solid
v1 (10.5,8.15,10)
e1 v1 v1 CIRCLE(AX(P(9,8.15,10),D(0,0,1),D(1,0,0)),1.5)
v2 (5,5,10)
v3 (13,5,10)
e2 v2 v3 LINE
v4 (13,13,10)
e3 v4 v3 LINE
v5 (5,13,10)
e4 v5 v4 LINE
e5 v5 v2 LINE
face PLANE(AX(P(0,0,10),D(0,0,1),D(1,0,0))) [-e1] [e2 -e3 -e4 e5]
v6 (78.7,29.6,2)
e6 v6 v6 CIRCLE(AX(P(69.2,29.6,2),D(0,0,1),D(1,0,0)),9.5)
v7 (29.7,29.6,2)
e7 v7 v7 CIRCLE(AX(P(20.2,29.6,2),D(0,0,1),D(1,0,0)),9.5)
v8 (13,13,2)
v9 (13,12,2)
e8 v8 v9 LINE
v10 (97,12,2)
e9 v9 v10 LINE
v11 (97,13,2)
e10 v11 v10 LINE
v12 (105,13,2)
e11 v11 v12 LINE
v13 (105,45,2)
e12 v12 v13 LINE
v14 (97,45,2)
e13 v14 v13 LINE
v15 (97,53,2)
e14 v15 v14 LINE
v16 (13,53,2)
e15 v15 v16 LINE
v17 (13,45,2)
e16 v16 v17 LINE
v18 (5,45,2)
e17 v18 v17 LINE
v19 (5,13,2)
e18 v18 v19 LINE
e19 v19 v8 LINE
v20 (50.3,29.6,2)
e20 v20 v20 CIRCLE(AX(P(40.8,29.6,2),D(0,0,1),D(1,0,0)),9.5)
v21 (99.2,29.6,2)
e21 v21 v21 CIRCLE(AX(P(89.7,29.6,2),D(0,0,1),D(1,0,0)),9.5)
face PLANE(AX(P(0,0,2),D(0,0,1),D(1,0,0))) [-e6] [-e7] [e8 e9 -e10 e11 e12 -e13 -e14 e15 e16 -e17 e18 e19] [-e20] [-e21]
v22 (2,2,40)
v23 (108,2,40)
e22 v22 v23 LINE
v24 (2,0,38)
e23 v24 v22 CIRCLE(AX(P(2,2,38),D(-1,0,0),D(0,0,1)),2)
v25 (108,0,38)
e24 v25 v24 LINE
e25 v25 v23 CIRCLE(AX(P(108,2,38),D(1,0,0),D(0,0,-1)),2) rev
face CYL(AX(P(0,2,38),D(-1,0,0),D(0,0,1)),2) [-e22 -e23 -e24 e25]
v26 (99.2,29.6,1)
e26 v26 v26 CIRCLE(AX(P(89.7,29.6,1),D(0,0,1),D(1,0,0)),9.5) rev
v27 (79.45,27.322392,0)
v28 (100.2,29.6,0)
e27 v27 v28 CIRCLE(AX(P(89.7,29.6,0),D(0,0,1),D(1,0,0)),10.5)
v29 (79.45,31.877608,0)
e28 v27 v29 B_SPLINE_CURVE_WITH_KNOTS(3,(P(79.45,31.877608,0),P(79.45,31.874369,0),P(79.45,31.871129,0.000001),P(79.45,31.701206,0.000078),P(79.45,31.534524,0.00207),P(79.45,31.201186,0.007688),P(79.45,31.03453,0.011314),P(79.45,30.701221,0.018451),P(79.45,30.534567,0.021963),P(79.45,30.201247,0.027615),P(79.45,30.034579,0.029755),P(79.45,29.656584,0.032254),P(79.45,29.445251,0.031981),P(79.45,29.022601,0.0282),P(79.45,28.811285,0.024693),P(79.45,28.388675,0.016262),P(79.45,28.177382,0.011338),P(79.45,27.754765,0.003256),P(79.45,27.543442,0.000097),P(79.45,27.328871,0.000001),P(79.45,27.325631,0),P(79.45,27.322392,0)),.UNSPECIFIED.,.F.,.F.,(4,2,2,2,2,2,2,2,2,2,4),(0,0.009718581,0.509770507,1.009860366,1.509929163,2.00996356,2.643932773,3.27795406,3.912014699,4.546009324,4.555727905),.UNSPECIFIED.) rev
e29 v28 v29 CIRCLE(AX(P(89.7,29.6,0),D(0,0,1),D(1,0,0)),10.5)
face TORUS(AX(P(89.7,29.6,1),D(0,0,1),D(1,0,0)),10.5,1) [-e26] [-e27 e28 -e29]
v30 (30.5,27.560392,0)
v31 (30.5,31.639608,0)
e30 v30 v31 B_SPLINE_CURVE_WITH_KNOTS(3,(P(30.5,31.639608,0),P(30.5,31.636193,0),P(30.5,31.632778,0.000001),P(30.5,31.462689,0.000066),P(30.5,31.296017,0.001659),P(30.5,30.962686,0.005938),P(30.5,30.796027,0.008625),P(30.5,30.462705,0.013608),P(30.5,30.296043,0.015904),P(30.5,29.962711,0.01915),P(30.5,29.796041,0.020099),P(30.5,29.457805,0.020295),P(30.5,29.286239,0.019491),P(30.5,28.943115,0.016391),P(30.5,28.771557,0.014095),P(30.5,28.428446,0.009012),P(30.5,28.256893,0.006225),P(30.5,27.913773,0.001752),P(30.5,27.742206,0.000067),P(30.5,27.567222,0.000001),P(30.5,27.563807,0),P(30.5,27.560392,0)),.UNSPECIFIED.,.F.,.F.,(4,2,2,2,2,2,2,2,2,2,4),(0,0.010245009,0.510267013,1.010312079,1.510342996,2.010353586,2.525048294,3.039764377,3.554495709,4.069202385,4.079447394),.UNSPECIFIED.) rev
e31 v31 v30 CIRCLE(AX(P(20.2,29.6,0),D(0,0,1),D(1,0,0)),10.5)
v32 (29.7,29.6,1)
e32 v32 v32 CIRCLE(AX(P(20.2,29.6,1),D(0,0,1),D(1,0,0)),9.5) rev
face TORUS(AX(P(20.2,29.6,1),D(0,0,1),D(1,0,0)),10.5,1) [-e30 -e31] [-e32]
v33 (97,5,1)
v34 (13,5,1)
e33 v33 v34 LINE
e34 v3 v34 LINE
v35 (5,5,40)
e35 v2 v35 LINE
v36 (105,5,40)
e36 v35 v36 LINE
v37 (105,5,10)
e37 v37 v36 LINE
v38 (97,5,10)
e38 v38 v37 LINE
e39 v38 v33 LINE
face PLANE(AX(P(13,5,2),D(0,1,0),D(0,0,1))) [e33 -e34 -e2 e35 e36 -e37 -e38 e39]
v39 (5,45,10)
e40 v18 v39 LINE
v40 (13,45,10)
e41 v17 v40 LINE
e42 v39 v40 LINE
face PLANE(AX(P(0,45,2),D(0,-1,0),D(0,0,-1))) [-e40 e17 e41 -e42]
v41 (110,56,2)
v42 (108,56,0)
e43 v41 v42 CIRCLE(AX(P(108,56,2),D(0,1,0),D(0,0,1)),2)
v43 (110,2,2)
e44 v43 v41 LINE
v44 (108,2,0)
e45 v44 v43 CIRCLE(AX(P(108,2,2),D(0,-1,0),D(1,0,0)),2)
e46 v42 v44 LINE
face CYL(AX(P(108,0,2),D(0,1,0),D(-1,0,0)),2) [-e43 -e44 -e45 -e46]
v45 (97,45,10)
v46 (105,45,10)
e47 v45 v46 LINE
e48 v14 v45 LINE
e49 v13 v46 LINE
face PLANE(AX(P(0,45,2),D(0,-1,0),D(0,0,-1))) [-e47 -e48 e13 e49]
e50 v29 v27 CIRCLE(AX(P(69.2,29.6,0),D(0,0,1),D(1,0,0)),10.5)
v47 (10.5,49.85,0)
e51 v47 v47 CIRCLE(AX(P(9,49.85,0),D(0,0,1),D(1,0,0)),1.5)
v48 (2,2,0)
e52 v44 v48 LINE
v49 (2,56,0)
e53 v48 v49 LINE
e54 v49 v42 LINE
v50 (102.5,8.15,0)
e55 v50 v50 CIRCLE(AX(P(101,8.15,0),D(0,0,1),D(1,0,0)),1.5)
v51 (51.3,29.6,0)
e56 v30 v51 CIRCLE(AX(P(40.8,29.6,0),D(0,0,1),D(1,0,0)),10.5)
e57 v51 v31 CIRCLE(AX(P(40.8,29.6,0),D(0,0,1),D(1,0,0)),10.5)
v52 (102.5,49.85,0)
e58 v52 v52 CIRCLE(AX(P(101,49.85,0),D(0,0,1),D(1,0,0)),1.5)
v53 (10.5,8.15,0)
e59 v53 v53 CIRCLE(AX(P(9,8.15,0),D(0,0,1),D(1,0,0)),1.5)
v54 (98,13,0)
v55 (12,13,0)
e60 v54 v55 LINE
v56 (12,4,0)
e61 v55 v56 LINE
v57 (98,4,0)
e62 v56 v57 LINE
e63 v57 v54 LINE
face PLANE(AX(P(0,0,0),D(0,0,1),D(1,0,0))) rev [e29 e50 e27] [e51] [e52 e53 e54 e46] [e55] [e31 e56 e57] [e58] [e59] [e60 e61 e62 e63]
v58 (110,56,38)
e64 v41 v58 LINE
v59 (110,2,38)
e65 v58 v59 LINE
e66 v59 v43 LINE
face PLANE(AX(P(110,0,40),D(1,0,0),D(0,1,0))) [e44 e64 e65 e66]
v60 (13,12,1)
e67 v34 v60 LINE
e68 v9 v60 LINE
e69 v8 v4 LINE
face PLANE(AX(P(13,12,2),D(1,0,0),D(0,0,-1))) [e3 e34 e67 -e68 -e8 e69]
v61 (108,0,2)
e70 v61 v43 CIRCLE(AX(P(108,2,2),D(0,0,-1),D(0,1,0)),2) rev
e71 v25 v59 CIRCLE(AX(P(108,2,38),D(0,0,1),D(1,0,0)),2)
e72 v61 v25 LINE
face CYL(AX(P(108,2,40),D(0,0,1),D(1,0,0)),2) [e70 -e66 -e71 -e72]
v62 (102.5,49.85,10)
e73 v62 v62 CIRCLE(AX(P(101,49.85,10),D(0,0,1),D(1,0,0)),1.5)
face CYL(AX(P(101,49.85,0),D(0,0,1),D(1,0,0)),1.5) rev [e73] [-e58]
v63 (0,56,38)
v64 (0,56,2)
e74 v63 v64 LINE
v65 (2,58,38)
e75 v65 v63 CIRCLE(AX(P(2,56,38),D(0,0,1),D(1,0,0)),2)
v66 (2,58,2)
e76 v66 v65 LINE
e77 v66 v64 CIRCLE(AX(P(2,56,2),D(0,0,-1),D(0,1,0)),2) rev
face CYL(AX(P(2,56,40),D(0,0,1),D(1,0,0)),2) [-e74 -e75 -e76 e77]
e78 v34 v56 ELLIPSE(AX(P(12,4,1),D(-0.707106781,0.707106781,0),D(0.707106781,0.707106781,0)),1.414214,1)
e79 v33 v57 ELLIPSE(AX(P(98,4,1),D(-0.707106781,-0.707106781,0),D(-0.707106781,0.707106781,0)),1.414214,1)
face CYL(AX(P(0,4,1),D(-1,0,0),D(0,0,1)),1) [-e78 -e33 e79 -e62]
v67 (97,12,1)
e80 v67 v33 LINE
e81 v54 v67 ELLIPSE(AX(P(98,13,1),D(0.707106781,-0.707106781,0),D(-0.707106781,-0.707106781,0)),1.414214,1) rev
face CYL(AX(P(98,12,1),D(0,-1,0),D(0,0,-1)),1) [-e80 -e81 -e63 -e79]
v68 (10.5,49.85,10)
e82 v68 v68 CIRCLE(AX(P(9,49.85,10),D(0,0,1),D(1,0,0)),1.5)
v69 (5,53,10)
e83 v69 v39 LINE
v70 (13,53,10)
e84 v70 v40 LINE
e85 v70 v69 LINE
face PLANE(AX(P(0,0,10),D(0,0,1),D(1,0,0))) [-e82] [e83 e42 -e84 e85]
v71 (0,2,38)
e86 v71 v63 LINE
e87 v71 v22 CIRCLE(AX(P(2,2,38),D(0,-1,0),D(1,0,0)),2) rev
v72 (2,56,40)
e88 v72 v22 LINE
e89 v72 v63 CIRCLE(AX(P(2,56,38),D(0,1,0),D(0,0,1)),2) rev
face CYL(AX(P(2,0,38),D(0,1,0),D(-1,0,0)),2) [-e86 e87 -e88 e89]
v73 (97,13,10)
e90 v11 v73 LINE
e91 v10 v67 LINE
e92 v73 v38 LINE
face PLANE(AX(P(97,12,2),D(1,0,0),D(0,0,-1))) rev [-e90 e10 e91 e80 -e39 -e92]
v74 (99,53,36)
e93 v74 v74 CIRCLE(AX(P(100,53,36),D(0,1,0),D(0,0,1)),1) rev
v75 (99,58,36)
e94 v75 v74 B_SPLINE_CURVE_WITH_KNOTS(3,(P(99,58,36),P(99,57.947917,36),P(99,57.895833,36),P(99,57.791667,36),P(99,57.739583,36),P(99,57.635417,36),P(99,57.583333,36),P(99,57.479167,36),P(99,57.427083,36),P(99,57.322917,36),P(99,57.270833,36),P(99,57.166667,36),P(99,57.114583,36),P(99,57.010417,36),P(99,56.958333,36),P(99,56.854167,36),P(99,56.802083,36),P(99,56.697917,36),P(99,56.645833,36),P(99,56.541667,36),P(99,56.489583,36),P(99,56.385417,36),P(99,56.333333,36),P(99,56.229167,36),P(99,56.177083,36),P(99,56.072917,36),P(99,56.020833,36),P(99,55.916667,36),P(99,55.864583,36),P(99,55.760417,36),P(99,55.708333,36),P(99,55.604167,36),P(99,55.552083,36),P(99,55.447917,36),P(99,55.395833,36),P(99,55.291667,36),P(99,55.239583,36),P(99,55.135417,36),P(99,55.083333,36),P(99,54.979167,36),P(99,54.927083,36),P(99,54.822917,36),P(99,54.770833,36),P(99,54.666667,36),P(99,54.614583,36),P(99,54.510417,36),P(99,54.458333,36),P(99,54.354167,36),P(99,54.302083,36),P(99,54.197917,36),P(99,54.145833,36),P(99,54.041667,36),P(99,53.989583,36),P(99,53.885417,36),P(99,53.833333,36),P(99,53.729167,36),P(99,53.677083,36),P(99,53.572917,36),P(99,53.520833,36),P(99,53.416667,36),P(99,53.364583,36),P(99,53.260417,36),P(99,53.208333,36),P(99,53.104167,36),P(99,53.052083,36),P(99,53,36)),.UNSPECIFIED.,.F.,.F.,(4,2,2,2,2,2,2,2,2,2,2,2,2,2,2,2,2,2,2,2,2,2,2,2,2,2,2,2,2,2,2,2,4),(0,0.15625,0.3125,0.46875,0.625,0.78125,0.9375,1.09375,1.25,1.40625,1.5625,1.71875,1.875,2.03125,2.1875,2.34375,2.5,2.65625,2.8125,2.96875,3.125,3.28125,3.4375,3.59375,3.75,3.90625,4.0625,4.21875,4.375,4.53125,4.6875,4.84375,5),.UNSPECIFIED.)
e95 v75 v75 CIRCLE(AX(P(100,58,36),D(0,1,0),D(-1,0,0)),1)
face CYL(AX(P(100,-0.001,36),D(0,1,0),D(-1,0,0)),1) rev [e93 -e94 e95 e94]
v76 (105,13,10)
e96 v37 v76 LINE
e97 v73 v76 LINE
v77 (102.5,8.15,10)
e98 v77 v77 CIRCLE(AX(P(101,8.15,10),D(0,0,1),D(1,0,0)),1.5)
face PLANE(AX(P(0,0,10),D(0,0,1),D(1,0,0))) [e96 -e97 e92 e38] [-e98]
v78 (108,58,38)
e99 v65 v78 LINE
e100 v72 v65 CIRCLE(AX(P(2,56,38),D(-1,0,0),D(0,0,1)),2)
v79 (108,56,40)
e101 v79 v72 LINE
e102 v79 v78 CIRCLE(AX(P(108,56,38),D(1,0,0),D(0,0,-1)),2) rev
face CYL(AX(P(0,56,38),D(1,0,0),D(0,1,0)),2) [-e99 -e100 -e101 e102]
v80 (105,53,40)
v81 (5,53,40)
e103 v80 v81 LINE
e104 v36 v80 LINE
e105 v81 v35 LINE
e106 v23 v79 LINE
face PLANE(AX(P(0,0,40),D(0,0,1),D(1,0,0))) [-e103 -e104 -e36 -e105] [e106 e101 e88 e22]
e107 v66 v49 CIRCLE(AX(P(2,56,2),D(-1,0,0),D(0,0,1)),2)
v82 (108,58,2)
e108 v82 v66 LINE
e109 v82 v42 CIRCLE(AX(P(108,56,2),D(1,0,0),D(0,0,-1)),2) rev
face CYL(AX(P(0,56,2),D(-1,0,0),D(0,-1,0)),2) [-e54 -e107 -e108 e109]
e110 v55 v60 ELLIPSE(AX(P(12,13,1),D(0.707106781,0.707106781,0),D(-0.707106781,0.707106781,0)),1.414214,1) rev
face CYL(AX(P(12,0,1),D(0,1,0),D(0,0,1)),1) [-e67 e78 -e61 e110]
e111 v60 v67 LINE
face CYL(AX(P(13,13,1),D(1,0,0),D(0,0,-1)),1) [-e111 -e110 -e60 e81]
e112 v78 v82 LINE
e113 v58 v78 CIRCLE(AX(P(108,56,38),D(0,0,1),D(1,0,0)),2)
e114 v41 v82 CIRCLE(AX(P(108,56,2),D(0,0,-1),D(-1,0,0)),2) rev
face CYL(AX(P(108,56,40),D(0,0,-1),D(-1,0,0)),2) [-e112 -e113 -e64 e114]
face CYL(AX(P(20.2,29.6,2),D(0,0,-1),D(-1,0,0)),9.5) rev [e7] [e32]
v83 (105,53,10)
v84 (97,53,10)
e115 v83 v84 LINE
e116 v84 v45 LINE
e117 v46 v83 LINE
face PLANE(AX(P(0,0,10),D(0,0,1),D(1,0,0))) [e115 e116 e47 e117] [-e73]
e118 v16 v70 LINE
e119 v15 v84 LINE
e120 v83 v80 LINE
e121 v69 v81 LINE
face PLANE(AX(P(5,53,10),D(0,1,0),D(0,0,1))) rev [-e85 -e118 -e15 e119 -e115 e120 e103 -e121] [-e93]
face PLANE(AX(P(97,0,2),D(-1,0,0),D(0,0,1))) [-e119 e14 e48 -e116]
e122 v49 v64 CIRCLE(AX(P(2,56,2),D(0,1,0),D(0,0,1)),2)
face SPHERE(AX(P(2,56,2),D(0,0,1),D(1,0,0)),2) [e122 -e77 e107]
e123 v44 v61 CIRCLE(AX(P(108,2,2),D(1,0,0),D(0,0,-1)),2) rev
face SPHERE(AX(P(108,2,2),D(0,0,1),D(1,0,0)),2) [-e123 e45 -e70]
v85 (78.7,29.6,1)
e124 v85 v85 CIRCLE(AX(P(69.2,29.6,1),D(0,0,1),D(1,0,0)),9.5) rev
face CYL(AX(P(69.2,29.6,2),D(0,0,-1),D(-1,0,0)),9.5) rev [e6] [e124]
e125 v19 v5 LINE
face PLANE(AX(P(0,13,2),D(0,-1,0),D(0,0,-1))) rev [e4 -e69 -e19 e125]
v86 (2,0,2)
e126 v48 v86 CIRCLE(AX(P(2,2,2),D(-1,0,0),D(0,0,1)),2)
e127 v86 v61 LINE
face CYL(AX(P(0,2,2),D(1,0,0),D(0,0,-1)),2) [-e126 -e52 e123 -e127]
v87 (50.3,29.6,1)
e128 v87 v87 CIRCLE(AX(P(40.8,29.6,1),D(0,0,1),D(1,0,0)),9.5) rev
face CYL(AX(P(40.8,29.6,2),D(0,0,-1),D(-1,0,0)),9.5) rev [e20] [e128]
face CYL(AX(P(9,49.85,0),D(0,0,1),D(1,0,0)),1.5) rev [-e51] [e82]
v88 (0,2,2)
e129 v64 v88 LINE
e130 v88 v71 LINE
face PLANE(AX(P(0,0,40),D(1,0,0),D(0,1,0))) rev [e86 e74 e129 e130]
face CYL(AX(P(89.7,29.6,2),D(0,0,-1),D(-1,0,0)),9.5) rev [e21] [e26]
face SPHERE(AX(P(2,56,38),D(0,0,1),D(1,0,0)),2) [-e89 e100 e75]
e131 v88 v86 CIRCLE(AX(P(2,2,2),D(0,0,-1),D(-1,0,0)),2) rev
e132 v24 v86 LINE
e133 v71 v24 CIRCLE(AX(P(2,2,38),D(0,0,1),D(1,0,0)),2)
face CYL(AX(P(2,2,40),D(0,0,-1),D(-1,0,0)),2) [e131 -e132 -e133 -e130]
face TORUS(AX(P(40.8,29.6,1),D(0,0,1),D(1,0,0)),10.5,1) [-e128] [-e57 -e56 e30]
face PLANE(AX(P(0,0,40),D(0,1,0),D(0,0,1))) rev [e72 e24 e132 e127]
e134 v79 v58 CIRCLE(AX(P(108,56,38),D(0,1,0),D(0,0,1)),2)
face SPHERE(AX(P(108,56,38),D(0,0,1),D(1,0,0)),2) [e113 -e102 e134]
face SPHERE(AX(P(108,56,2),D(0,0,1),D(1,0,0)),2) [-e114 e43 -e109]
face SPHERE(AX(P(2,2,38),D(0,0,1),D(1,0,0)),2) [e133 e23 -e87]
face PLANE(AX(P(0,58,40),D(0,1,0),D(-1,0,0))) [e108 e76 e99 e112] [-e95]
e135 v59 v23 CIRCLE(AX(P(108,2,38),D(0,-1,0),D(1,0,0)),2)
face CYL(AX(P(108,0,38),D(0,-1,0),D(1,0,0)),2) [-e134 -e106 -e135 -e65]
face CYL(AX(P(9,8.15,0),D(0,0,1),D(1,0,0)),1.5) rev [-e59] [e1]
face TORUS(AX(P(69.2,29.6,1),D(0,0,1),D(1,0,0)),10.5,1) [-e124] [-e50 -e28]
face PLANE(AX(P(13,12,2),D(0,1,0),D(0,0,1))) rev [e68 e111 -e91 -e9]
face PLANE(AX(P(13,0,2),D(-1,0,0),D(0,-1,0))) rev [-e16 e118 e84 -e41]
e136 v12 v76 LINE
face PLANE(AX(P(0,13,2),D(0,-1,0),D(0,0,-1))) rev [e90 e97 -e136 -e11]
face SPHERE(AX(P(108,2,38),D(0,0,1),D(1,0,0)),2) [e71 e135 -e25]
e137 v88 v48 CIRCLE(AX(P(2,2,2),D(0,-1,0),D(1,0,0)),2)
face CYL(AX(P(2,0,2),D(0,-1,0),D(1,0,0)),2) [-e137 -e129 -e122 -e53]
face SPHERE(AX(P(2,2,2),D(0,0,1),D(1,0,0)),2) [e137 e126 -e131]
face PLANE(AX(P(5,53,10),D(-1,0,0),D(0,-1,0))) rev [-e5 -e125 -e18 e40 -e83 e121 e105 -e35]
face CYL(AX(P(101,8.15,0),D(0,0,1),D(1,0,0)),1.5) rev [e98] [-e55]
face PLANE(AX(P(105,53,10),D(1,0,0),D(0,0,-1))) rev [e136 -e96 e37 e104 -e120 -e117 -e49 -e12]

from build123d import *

# Parameters (mm, degrees)
SKETCH_1_W               = 110
SKETCH_1_H               = 58
EXTRUDE_1_DEPTH          = 40
SKETCH_1_4_R             = 9.5
SKETCH_1_4_W             = 84
SKETCH_1_4_H             = 7
CUT_EXTRUDE_1_DEPTH      = 2
SKETCH_2_OUTSIDE_W       = 138.126
SKETCH_2_OUTSIDE_H       = 86.126
SKETCH_2_OUTSIDE_W_2     = 110
SKETCH_2_OUTSIDE_H_2     = 58
SKETCH_2_OUTSIDE_W_3     = 100
SKETCH_2_OUTSIDE_H_3     = 48
CUT_EXTRUDE_4_DEPTH      = 30
CUT_EXTRUDE_5_REACH      = 132.629
SKETCH_3_R               = 1
CUT_EXTRUDE_8_DEPTH      = 8
CUT_EXTRUDE_9_DEPTH      = 128.921851144
CUT_EXTRUDE_9_DEPTH_BACK = 128.921851144
SKETCH_5_3_R             = 1.5
FILLET_1_R               = 2
FILLET_3_R               = 1


with BuildPart() as part:
    # Эскиз1 → Бобышка-Вытянуть1 (new body)
    with BuildSketch(Plane.XY):
        with Locations((55, 29)):
            Rectangle(SKETCH_1_W, SKETCH_1_H)
    extrude(amount=EXTRUDE_1_DEPTH)

    # Эскиз1<4> → Вырез-Вытянуть1 (cut)
    with BuildSketch(Plane.XY):
        with Locations((20.2, 29.6)):
            Circle(SKETCH_1_4_R)
        with Locations((89.7, 29.6)):
            Circle(SKETCH_1_4_R)
        with Locations((69.2, 29.6)):
            Circle(SKETCH_1_4_R)
        with Locations((40.8, 29.6)):
            Circle(SKETCH_1_4_R)
        with Locations((55, 8.5)):
            Rectangle(SKETCH_1_4_W, SKETCH_1_4_H)
    extrude(amount=CUT_EXTRUDE_1_DEPTH, mode=Mode.SUBTRACT)

    # Эскиз2 outside → Вырез-Вытянуть4 (cut)
    # profile 1 of 2: a face of its own
    with BuildSketch(Plane.XY.offset(40)):
        with Locations((55, 29)):
            Rectangle(SKETCH_2_OUTSIDE_W, SKETCH_2_OUTSIDE_H)
        with Locations((55, 29)):
            Rectangle(SKETCH_2_OUTSIDE_W_2, SKETCH_2_OUTSIDE_H_2, mode=Mode.SUBTRACT)
    # profile 2 of 2: a face of its own
    with BuildSketch(Plane.XY.offset(40)):
        with Locations((55, 29)):
            Rectangle(SKETCH_2_OUTSIDE_W_3, SKETCH_2_OUTSIDE_H_3)
    extrude(amount=-CUT_EXTRUDE_4_DEPTH, mode=Mode.SUBTRACT)

    # Эскиз3 → Вырез-Вытянуть5 (cut, up to next)
    with BuildSketch(Plane(origin=(0, 58, 0), x_dir=(1, 0, 0), z_dir=(0, 1, 0)), mode=Mode.PRIVATE) as cut_extrude_5_sk1:
        with Locations(Location((100, -36, 0), (0, 0, 180))):
            Circle(SKETCH_3_R)
    cut_extrude_5_tool1 = extrude(cut_extrude_5_sk1.sketch, amount=-CUT_EXTRUDE_5_REACH, mode=Mode.PRIVATE) & part.part
    add(cut_extrude_5_tool1.solids().sort_by_distance((100, 58, 36))[0], mode=Mode.SUBTRACT)

    # Эскиз5 → Вырез-Вытянуть8 (cut)
    with BuildSketch(Plane.XY.offset(10)):
        Polygon((97, 53), (13, 53), (13, 45), (5, 45), (5, 13), (13, 13), (13, 5), (97, 5), (97, 13), (105, 13), (105, 45), (97, 45), align=None)
    extrude(amount=-CUT_EXTRUDE_8_DEPTH, mode=Mode.SUBTRACT)

    # Эскиз5<3> → Вырез-Вытянуть9 (cut, two sides: drawn at the far end of the back side and taken through both)
    with BuildSketch(Plane.XY.offset(10).offset(-CUT_EXTRUDE_9_DEPTH_BACK)):
        with Locations((9, 8.15)):
            Circle(SKETCH_5_3_R)
        with Locations((101, 49.85)):
            Circle(SKETCH_5_3_R)
        with Locations((9, 49.85)):
            Circle(SKETCH_5_3_R)
        with Locations((101, 8.15)):
            Circle(SKETCH_5_3_R)
    extrude(amount=CUT_EXTRUDE_9_DEPTH + CUT_EXTRUDE_9_DEPTH_BACK, mode=Mode.SUBTRACT)

    # Скругление1
    fillet_1_edges = [part.edges().sort_by_distance(p)[0] for p in [
        (55, 58, 40),
        (0, 29, 40),
        (55, 0, 40),
        (110, 29, 40),
        (55, 0, 0),
        (0, 29, 0),
        (55, 58, 0),
        (110, 29, 0),
        (110, 0, 20),
        (0, 0, 20),
        (0, 58, 20),
        (110, 58, 20),
    ]]
    fillet(fillet_1_edges, radius=FILLET_1_R)

    # Скругление3
    # the kernel refuses this fillet: 1 mm, written as the material it takes off along each edge
    with BuildSketch(Plane(origin=(40.8, 29.6, 0), x_dir=(1, 0, 0), z_dir=(0, -1, 0))) as fillet_3_piece_1:
        with BuildLine():
            CenterArc((9.5 + FILLET_3_R, FILLET_3_R), FILLET_3_R, 180, 90)
            Line((9.5, FILLET_3_R), (9.5, 0))
            Line((9.5, 0), (9.5 + FILLET_3_R, 0))
        make_face()
    revolve(axis=Axis((40.8, 29.6, 0), (0, 0, 1)), mode=Mode.SUBTRACT)
    with BuildSketch(Plane(origin=(69.2, 29.6, 0), x_dir=(1, 0, 0), z_dir=(0, -1, 0))) as fillet_3_piece_2:
        with BuildLine():
            CenterArc((9.5 + FILLET_3_R, FILLET_3_R), FILLET_3_R, 180, 90)
            Line((9.5, FILLET_3_R), (9.5, 0))
            Line((9.5, 0), (9.5 + FILLET_3_R, 0))
        make_face()
    revolve(axis=Axis((69.2, 29.6, 0), (0, 0, 1)), mode=Mode.SUBTRACT)
    with BuildSketch(Plane(origin=(89.7, 29.6, 0), x_dir=(1, 0, 0), z_dir=(0, -1, 0))) as fillet_3_piece_3:
        with BuildLine():
            CenterArc((9.5 + FILLET_3_R, FILLET_3_R), FILLET_3_R, 180, 90)
            Line((9.5, FILLET_3_R), (9.5, 0))
            Line((9.5, 0), (9.5 + FILLET_3_R, 0))
        make_face()
    revolve(axis=Axis((89.7, 29.6, 0), (0, 0, 1)), mode=Mode.SUBTRACT)
    with BuildSketch(Plane(origin=(13, 5, 0), x_dir=(-1, 0, 0), z_dir=(0, 1, 0)), Plane(origin=(97, 12, 0), x_dir=(1, 0, 0), z_dir=(0, -1, 0))) as fillet_3_piece_4:
        with BuildLine():
            CenterArc((FILLET_3_R, FILLET_3_R), FILLET_3_R, 180, 90)
            Line((0, FILLET_3_R), (0, 0))
            Line((0, 0), (FILLET_3_R, 0))
        make_face()
    extrude(amount=7, mode=Mode.SUBTRACT)
    with BuildSketch(Plane(origin=(97, 5, 0), x_dir=(0, -1, 0), z_dir=(-1, 0, 0)), Plane(origin=(13, 12, 0), x_dir=(0, 1, 0), z_dir=(1, 0, 0))) as fillet_3_piece_5:
        with BuildLine():
            CenterArc((FILLET_3_R, FILLET_3_R), FILLET_3_R, 180, 90)
            Line((0, FILLET_3_R), (0, 0))
            Line((0, 0), (FILLET_3_R, 0))
        make_face()
    extrude(amount=84, mode=Mode.SUBTRACT)
    with BuildSketch(Plane(origin=(20.2, 29.6, 0), x_dir=(1, 0, 0), z_dir=(0, -1, 0))) as fillet_3_piece_6:
        with BuildLine():
            CenterArc((9.5 + FILLET_3_R, FILLET_3_R), FILLET_3_R, 180, 90)
            Line((9.5, FILLET_3_R), (9.5, 0))
            Line((9.5, 0), (9.5 + FILLET_3_R, 0))
        make_face()
    revolve(axis=Axis((20.2, 29.6, 0), (0, 0, 1)), mode=Mode.SUBTRACT)
    with BuildSketch(Plane(origin=(13, 2.5, 0), x_dir=(-1, 0, 0), z_dir=(0, 1, 0))) as fillet_3_piece_7a_section:
        with BuildLine():
            CenterArc((FILLET_3_R, FILLET_3_R), FILLET_3_R, 180, 90)
            Line((0, FILLET_3_R), (0, 0))
            Line((0, 0), (FILLET_3_R, 0))
        make_face()
    fillet_3_piece_7a = extrude(amount=9.5, mode=Mode.PRIVATE)
    fillet_3_piece_7a = split(fillet_3_piece_7a, bisect_by=Plane(origin=(12.773604886, 5, 0.226395114), z_dir=(0, -1, 0)), keep=Keep.TOP, mode=Mode.PRIVATE)
    with BuildSketch(Plane(origin=(97, 5, 0), x_dir=(0, -1, 0), z_dir=(-1, 0, 0))) as fillet_3_piece_7b_section:
        with BuildLine():
            CenterArc((FILLET_3_R, FILLET_3_R), FILLET_3_R, 180, 90)
            Line((0, FILLET_3_R), (0, 0))
            Line((0, 0), (FILLET_3_R, 0))
        make_face()
    fillet_3_piece_7b = extrude(amount=86.5, mode=Mode.PRIVATE)
    fillet_3_piece_7b = split(fillet_3_piece_7b, bisect_by=Plane(origin=(13, 4.773604886, 0.226395114), z_dir=(-1, 0, 0)), keep=Keep.TOP, mode=Mode.PRIVATE)
    fillet_3_piece_7 = fillet_3_piece_7a & fillet_3_piece_7b
    add(fillet_3_piece_7, mode=Mode.SUBTRACT)
    with BuildSketch(Plane(origin=(10.5, 12, 0), x_dir=(0, 1, 0), z_dir=(1, 0, 0))) as fillet_3_piece_8a_section:
        with BuildLine():
            CenterArc((FILLET_3_R, FILLET_3_R), FILLET_3_R, 180, 90)
            Line((0, FILLET_3_R), (0, 0))
            Line((0, 0), (FILLET_3_R, 0))
        make_face()
    fillet_3_piece_8a = extrude(amount=86.5, mode=Mode.PRIVATE)
    fillet_3_piece_8a = split(fillet_3_piece_8a, bisect_by=Plane(origin=(13, 12.226395114, 0.226395114), z_dir=(-1, 0, 0)), keep=Keep.TOP, mode=Mode.PRIVATE)
    with BuildSketch(Plane(origin=(13, 5, 0), x_dir=(-1, 0, 0), z_dir=(0, 1, 0))) as fillet_3_piece_8b_section:
        with BuildLine():
            CenterArc((FILLET_3_R, FILLET_3_R), FILLET_3_R, 180, 90)
            Line((0, FILLET_3_R), (0, 0))
            Line((0, 0), (FILLET_3_R, 0))
        make_face()
    fillet_3_piece_8b = extrude(amount=9.5, mode=Mode.PRIVATE)
    fillet_3_piece_8b = split(fillet_3_piece_8b, bisect_by=Plane(origin=(12.773604886, 12, 0.226395114), z_dir=(0, 1, 0)), keep=Keep.TOP, mode=Mode.PRIVATE)
    fillet_3_piece_8 = fillet_3_piece_8a & fillet_3_piece_8b
    add(fillet_3_piece_8, mode=Mode.SUBTRACT)
    with BuildSketch(Plane(origin=(97, 12, 0), x_dir=(1, 0, 0), z_dir=(0, -1, 0))) as fillet_3_piece_9a_section:
        with BuildLine():
            CenterArc((FILLET_3_R, FILLET_3_R), FILLET_3_R, 180, 90)
            Line((0, FILLET_3_R), (0, 0))
            Line((0, 0), (FILLET_3_R, 0))
        make_face()
    fillet_3_piece_9a = extrude(amount=9.5, mode=Mode.PRIVATE)
    fillet_3_piece_9a = split(fillet_3_piece_9a, bisect_by=Plane(origin=(97.226395114, 5, 0.226395114), z_dir=(0, -1, 0)), keep=Keep.TOP, mode=Mode.PRIVATE)
    with BuildSketch(Plane(origin=(99.5, 5, 0), x_dir=(0, -1, 0), z_dir=(-1, 0, 0))) as fillet_3_piece_9b_section:
        with BuildLine():
            CenterArc((FILLET_3_R, FILLET_3_R), FILLET_3_R, 180, 90)
            Line((0, FILLET_3_R), (0, 0))
            Line((0, 0), (FILLET_3_R, 0))
        make_face()
    fillet_3_piece_9b = extrude(amount=86.5, mode=Mode.PRIVATE)
    fillet_3_piece_9b = split(fillet_3_piece_9b, bisect_by=Plane(origin=(97, 4.773604886, 0.226395114), z_dir=(1, 0, 0)), keep=Keep.TOP, mode=Mode.PRIVATE)
    fillet_3_piece_9 = fillet_3_piece_9a & fillet_3_piece_9b
    add(fillet_3_piece_9, mode=Mode.SUBTRACT)
    with BuildSketch(Plane(origin=(13, 12, 0), x_dir=(0, 1, 0), z_dir=(1, 0, 0))) as fillet_3_piece_10a_section:
        with BuildLine():
            CenterArc((FILLET_3_R, FILLET_3_R), FILLET_3_R, 180, 90)
            Line((0, FILLET_3_R), (0, 0))
            Line((0, 0), (FILLET_3_R, 0))
        make_face()
    fillet_3_piece_10a = extrude(amount=86.5, mode=Mode.PRIVATE)
    fillet_3_piece_10a = split(fillet_3_piece_10a, bisect_by=Plane(origin=(97, 12.226395114, 0.226395114), z_dir=(1, 0, 0)), keep=Keep.TOP, mode=Mode.PRIVATE)
    with BuildSketch(Plane(origin=(97, 14.5, 0), x_dir=(1, 0, 0), z_dir=(0, -1, 0))) as fillet_3_piece_10b_section:
        with BuildLine():
            CenterArc((FILLET_3_R, FILLET_3_R), FILLET_3_R, 180, 90)
            Line((0, FILLET_3_R), (0, 0))
            Line((0, 0), (FILLET_3_R, 0))
        make_face()
    fillet_3_piece_10b = extrude(amount=9.5, mode=Mode.PRIVATE)
    fillet_3_piece_10b = split(fillet_3_piece_10b, bisect_by=Plane(origin=(97.226395114, 12, 0.226395114), z_dir=(0, 1, 0)), keep=Keep.TOP, mode=Mode.PRIVATE)
    fillet_3_piece_10 = fillet_3_piece_10a & fillet_3_piece_10b
    add(fillet_3_piece_10, mode=Mode.SUBTRACT)


solid = part.part
